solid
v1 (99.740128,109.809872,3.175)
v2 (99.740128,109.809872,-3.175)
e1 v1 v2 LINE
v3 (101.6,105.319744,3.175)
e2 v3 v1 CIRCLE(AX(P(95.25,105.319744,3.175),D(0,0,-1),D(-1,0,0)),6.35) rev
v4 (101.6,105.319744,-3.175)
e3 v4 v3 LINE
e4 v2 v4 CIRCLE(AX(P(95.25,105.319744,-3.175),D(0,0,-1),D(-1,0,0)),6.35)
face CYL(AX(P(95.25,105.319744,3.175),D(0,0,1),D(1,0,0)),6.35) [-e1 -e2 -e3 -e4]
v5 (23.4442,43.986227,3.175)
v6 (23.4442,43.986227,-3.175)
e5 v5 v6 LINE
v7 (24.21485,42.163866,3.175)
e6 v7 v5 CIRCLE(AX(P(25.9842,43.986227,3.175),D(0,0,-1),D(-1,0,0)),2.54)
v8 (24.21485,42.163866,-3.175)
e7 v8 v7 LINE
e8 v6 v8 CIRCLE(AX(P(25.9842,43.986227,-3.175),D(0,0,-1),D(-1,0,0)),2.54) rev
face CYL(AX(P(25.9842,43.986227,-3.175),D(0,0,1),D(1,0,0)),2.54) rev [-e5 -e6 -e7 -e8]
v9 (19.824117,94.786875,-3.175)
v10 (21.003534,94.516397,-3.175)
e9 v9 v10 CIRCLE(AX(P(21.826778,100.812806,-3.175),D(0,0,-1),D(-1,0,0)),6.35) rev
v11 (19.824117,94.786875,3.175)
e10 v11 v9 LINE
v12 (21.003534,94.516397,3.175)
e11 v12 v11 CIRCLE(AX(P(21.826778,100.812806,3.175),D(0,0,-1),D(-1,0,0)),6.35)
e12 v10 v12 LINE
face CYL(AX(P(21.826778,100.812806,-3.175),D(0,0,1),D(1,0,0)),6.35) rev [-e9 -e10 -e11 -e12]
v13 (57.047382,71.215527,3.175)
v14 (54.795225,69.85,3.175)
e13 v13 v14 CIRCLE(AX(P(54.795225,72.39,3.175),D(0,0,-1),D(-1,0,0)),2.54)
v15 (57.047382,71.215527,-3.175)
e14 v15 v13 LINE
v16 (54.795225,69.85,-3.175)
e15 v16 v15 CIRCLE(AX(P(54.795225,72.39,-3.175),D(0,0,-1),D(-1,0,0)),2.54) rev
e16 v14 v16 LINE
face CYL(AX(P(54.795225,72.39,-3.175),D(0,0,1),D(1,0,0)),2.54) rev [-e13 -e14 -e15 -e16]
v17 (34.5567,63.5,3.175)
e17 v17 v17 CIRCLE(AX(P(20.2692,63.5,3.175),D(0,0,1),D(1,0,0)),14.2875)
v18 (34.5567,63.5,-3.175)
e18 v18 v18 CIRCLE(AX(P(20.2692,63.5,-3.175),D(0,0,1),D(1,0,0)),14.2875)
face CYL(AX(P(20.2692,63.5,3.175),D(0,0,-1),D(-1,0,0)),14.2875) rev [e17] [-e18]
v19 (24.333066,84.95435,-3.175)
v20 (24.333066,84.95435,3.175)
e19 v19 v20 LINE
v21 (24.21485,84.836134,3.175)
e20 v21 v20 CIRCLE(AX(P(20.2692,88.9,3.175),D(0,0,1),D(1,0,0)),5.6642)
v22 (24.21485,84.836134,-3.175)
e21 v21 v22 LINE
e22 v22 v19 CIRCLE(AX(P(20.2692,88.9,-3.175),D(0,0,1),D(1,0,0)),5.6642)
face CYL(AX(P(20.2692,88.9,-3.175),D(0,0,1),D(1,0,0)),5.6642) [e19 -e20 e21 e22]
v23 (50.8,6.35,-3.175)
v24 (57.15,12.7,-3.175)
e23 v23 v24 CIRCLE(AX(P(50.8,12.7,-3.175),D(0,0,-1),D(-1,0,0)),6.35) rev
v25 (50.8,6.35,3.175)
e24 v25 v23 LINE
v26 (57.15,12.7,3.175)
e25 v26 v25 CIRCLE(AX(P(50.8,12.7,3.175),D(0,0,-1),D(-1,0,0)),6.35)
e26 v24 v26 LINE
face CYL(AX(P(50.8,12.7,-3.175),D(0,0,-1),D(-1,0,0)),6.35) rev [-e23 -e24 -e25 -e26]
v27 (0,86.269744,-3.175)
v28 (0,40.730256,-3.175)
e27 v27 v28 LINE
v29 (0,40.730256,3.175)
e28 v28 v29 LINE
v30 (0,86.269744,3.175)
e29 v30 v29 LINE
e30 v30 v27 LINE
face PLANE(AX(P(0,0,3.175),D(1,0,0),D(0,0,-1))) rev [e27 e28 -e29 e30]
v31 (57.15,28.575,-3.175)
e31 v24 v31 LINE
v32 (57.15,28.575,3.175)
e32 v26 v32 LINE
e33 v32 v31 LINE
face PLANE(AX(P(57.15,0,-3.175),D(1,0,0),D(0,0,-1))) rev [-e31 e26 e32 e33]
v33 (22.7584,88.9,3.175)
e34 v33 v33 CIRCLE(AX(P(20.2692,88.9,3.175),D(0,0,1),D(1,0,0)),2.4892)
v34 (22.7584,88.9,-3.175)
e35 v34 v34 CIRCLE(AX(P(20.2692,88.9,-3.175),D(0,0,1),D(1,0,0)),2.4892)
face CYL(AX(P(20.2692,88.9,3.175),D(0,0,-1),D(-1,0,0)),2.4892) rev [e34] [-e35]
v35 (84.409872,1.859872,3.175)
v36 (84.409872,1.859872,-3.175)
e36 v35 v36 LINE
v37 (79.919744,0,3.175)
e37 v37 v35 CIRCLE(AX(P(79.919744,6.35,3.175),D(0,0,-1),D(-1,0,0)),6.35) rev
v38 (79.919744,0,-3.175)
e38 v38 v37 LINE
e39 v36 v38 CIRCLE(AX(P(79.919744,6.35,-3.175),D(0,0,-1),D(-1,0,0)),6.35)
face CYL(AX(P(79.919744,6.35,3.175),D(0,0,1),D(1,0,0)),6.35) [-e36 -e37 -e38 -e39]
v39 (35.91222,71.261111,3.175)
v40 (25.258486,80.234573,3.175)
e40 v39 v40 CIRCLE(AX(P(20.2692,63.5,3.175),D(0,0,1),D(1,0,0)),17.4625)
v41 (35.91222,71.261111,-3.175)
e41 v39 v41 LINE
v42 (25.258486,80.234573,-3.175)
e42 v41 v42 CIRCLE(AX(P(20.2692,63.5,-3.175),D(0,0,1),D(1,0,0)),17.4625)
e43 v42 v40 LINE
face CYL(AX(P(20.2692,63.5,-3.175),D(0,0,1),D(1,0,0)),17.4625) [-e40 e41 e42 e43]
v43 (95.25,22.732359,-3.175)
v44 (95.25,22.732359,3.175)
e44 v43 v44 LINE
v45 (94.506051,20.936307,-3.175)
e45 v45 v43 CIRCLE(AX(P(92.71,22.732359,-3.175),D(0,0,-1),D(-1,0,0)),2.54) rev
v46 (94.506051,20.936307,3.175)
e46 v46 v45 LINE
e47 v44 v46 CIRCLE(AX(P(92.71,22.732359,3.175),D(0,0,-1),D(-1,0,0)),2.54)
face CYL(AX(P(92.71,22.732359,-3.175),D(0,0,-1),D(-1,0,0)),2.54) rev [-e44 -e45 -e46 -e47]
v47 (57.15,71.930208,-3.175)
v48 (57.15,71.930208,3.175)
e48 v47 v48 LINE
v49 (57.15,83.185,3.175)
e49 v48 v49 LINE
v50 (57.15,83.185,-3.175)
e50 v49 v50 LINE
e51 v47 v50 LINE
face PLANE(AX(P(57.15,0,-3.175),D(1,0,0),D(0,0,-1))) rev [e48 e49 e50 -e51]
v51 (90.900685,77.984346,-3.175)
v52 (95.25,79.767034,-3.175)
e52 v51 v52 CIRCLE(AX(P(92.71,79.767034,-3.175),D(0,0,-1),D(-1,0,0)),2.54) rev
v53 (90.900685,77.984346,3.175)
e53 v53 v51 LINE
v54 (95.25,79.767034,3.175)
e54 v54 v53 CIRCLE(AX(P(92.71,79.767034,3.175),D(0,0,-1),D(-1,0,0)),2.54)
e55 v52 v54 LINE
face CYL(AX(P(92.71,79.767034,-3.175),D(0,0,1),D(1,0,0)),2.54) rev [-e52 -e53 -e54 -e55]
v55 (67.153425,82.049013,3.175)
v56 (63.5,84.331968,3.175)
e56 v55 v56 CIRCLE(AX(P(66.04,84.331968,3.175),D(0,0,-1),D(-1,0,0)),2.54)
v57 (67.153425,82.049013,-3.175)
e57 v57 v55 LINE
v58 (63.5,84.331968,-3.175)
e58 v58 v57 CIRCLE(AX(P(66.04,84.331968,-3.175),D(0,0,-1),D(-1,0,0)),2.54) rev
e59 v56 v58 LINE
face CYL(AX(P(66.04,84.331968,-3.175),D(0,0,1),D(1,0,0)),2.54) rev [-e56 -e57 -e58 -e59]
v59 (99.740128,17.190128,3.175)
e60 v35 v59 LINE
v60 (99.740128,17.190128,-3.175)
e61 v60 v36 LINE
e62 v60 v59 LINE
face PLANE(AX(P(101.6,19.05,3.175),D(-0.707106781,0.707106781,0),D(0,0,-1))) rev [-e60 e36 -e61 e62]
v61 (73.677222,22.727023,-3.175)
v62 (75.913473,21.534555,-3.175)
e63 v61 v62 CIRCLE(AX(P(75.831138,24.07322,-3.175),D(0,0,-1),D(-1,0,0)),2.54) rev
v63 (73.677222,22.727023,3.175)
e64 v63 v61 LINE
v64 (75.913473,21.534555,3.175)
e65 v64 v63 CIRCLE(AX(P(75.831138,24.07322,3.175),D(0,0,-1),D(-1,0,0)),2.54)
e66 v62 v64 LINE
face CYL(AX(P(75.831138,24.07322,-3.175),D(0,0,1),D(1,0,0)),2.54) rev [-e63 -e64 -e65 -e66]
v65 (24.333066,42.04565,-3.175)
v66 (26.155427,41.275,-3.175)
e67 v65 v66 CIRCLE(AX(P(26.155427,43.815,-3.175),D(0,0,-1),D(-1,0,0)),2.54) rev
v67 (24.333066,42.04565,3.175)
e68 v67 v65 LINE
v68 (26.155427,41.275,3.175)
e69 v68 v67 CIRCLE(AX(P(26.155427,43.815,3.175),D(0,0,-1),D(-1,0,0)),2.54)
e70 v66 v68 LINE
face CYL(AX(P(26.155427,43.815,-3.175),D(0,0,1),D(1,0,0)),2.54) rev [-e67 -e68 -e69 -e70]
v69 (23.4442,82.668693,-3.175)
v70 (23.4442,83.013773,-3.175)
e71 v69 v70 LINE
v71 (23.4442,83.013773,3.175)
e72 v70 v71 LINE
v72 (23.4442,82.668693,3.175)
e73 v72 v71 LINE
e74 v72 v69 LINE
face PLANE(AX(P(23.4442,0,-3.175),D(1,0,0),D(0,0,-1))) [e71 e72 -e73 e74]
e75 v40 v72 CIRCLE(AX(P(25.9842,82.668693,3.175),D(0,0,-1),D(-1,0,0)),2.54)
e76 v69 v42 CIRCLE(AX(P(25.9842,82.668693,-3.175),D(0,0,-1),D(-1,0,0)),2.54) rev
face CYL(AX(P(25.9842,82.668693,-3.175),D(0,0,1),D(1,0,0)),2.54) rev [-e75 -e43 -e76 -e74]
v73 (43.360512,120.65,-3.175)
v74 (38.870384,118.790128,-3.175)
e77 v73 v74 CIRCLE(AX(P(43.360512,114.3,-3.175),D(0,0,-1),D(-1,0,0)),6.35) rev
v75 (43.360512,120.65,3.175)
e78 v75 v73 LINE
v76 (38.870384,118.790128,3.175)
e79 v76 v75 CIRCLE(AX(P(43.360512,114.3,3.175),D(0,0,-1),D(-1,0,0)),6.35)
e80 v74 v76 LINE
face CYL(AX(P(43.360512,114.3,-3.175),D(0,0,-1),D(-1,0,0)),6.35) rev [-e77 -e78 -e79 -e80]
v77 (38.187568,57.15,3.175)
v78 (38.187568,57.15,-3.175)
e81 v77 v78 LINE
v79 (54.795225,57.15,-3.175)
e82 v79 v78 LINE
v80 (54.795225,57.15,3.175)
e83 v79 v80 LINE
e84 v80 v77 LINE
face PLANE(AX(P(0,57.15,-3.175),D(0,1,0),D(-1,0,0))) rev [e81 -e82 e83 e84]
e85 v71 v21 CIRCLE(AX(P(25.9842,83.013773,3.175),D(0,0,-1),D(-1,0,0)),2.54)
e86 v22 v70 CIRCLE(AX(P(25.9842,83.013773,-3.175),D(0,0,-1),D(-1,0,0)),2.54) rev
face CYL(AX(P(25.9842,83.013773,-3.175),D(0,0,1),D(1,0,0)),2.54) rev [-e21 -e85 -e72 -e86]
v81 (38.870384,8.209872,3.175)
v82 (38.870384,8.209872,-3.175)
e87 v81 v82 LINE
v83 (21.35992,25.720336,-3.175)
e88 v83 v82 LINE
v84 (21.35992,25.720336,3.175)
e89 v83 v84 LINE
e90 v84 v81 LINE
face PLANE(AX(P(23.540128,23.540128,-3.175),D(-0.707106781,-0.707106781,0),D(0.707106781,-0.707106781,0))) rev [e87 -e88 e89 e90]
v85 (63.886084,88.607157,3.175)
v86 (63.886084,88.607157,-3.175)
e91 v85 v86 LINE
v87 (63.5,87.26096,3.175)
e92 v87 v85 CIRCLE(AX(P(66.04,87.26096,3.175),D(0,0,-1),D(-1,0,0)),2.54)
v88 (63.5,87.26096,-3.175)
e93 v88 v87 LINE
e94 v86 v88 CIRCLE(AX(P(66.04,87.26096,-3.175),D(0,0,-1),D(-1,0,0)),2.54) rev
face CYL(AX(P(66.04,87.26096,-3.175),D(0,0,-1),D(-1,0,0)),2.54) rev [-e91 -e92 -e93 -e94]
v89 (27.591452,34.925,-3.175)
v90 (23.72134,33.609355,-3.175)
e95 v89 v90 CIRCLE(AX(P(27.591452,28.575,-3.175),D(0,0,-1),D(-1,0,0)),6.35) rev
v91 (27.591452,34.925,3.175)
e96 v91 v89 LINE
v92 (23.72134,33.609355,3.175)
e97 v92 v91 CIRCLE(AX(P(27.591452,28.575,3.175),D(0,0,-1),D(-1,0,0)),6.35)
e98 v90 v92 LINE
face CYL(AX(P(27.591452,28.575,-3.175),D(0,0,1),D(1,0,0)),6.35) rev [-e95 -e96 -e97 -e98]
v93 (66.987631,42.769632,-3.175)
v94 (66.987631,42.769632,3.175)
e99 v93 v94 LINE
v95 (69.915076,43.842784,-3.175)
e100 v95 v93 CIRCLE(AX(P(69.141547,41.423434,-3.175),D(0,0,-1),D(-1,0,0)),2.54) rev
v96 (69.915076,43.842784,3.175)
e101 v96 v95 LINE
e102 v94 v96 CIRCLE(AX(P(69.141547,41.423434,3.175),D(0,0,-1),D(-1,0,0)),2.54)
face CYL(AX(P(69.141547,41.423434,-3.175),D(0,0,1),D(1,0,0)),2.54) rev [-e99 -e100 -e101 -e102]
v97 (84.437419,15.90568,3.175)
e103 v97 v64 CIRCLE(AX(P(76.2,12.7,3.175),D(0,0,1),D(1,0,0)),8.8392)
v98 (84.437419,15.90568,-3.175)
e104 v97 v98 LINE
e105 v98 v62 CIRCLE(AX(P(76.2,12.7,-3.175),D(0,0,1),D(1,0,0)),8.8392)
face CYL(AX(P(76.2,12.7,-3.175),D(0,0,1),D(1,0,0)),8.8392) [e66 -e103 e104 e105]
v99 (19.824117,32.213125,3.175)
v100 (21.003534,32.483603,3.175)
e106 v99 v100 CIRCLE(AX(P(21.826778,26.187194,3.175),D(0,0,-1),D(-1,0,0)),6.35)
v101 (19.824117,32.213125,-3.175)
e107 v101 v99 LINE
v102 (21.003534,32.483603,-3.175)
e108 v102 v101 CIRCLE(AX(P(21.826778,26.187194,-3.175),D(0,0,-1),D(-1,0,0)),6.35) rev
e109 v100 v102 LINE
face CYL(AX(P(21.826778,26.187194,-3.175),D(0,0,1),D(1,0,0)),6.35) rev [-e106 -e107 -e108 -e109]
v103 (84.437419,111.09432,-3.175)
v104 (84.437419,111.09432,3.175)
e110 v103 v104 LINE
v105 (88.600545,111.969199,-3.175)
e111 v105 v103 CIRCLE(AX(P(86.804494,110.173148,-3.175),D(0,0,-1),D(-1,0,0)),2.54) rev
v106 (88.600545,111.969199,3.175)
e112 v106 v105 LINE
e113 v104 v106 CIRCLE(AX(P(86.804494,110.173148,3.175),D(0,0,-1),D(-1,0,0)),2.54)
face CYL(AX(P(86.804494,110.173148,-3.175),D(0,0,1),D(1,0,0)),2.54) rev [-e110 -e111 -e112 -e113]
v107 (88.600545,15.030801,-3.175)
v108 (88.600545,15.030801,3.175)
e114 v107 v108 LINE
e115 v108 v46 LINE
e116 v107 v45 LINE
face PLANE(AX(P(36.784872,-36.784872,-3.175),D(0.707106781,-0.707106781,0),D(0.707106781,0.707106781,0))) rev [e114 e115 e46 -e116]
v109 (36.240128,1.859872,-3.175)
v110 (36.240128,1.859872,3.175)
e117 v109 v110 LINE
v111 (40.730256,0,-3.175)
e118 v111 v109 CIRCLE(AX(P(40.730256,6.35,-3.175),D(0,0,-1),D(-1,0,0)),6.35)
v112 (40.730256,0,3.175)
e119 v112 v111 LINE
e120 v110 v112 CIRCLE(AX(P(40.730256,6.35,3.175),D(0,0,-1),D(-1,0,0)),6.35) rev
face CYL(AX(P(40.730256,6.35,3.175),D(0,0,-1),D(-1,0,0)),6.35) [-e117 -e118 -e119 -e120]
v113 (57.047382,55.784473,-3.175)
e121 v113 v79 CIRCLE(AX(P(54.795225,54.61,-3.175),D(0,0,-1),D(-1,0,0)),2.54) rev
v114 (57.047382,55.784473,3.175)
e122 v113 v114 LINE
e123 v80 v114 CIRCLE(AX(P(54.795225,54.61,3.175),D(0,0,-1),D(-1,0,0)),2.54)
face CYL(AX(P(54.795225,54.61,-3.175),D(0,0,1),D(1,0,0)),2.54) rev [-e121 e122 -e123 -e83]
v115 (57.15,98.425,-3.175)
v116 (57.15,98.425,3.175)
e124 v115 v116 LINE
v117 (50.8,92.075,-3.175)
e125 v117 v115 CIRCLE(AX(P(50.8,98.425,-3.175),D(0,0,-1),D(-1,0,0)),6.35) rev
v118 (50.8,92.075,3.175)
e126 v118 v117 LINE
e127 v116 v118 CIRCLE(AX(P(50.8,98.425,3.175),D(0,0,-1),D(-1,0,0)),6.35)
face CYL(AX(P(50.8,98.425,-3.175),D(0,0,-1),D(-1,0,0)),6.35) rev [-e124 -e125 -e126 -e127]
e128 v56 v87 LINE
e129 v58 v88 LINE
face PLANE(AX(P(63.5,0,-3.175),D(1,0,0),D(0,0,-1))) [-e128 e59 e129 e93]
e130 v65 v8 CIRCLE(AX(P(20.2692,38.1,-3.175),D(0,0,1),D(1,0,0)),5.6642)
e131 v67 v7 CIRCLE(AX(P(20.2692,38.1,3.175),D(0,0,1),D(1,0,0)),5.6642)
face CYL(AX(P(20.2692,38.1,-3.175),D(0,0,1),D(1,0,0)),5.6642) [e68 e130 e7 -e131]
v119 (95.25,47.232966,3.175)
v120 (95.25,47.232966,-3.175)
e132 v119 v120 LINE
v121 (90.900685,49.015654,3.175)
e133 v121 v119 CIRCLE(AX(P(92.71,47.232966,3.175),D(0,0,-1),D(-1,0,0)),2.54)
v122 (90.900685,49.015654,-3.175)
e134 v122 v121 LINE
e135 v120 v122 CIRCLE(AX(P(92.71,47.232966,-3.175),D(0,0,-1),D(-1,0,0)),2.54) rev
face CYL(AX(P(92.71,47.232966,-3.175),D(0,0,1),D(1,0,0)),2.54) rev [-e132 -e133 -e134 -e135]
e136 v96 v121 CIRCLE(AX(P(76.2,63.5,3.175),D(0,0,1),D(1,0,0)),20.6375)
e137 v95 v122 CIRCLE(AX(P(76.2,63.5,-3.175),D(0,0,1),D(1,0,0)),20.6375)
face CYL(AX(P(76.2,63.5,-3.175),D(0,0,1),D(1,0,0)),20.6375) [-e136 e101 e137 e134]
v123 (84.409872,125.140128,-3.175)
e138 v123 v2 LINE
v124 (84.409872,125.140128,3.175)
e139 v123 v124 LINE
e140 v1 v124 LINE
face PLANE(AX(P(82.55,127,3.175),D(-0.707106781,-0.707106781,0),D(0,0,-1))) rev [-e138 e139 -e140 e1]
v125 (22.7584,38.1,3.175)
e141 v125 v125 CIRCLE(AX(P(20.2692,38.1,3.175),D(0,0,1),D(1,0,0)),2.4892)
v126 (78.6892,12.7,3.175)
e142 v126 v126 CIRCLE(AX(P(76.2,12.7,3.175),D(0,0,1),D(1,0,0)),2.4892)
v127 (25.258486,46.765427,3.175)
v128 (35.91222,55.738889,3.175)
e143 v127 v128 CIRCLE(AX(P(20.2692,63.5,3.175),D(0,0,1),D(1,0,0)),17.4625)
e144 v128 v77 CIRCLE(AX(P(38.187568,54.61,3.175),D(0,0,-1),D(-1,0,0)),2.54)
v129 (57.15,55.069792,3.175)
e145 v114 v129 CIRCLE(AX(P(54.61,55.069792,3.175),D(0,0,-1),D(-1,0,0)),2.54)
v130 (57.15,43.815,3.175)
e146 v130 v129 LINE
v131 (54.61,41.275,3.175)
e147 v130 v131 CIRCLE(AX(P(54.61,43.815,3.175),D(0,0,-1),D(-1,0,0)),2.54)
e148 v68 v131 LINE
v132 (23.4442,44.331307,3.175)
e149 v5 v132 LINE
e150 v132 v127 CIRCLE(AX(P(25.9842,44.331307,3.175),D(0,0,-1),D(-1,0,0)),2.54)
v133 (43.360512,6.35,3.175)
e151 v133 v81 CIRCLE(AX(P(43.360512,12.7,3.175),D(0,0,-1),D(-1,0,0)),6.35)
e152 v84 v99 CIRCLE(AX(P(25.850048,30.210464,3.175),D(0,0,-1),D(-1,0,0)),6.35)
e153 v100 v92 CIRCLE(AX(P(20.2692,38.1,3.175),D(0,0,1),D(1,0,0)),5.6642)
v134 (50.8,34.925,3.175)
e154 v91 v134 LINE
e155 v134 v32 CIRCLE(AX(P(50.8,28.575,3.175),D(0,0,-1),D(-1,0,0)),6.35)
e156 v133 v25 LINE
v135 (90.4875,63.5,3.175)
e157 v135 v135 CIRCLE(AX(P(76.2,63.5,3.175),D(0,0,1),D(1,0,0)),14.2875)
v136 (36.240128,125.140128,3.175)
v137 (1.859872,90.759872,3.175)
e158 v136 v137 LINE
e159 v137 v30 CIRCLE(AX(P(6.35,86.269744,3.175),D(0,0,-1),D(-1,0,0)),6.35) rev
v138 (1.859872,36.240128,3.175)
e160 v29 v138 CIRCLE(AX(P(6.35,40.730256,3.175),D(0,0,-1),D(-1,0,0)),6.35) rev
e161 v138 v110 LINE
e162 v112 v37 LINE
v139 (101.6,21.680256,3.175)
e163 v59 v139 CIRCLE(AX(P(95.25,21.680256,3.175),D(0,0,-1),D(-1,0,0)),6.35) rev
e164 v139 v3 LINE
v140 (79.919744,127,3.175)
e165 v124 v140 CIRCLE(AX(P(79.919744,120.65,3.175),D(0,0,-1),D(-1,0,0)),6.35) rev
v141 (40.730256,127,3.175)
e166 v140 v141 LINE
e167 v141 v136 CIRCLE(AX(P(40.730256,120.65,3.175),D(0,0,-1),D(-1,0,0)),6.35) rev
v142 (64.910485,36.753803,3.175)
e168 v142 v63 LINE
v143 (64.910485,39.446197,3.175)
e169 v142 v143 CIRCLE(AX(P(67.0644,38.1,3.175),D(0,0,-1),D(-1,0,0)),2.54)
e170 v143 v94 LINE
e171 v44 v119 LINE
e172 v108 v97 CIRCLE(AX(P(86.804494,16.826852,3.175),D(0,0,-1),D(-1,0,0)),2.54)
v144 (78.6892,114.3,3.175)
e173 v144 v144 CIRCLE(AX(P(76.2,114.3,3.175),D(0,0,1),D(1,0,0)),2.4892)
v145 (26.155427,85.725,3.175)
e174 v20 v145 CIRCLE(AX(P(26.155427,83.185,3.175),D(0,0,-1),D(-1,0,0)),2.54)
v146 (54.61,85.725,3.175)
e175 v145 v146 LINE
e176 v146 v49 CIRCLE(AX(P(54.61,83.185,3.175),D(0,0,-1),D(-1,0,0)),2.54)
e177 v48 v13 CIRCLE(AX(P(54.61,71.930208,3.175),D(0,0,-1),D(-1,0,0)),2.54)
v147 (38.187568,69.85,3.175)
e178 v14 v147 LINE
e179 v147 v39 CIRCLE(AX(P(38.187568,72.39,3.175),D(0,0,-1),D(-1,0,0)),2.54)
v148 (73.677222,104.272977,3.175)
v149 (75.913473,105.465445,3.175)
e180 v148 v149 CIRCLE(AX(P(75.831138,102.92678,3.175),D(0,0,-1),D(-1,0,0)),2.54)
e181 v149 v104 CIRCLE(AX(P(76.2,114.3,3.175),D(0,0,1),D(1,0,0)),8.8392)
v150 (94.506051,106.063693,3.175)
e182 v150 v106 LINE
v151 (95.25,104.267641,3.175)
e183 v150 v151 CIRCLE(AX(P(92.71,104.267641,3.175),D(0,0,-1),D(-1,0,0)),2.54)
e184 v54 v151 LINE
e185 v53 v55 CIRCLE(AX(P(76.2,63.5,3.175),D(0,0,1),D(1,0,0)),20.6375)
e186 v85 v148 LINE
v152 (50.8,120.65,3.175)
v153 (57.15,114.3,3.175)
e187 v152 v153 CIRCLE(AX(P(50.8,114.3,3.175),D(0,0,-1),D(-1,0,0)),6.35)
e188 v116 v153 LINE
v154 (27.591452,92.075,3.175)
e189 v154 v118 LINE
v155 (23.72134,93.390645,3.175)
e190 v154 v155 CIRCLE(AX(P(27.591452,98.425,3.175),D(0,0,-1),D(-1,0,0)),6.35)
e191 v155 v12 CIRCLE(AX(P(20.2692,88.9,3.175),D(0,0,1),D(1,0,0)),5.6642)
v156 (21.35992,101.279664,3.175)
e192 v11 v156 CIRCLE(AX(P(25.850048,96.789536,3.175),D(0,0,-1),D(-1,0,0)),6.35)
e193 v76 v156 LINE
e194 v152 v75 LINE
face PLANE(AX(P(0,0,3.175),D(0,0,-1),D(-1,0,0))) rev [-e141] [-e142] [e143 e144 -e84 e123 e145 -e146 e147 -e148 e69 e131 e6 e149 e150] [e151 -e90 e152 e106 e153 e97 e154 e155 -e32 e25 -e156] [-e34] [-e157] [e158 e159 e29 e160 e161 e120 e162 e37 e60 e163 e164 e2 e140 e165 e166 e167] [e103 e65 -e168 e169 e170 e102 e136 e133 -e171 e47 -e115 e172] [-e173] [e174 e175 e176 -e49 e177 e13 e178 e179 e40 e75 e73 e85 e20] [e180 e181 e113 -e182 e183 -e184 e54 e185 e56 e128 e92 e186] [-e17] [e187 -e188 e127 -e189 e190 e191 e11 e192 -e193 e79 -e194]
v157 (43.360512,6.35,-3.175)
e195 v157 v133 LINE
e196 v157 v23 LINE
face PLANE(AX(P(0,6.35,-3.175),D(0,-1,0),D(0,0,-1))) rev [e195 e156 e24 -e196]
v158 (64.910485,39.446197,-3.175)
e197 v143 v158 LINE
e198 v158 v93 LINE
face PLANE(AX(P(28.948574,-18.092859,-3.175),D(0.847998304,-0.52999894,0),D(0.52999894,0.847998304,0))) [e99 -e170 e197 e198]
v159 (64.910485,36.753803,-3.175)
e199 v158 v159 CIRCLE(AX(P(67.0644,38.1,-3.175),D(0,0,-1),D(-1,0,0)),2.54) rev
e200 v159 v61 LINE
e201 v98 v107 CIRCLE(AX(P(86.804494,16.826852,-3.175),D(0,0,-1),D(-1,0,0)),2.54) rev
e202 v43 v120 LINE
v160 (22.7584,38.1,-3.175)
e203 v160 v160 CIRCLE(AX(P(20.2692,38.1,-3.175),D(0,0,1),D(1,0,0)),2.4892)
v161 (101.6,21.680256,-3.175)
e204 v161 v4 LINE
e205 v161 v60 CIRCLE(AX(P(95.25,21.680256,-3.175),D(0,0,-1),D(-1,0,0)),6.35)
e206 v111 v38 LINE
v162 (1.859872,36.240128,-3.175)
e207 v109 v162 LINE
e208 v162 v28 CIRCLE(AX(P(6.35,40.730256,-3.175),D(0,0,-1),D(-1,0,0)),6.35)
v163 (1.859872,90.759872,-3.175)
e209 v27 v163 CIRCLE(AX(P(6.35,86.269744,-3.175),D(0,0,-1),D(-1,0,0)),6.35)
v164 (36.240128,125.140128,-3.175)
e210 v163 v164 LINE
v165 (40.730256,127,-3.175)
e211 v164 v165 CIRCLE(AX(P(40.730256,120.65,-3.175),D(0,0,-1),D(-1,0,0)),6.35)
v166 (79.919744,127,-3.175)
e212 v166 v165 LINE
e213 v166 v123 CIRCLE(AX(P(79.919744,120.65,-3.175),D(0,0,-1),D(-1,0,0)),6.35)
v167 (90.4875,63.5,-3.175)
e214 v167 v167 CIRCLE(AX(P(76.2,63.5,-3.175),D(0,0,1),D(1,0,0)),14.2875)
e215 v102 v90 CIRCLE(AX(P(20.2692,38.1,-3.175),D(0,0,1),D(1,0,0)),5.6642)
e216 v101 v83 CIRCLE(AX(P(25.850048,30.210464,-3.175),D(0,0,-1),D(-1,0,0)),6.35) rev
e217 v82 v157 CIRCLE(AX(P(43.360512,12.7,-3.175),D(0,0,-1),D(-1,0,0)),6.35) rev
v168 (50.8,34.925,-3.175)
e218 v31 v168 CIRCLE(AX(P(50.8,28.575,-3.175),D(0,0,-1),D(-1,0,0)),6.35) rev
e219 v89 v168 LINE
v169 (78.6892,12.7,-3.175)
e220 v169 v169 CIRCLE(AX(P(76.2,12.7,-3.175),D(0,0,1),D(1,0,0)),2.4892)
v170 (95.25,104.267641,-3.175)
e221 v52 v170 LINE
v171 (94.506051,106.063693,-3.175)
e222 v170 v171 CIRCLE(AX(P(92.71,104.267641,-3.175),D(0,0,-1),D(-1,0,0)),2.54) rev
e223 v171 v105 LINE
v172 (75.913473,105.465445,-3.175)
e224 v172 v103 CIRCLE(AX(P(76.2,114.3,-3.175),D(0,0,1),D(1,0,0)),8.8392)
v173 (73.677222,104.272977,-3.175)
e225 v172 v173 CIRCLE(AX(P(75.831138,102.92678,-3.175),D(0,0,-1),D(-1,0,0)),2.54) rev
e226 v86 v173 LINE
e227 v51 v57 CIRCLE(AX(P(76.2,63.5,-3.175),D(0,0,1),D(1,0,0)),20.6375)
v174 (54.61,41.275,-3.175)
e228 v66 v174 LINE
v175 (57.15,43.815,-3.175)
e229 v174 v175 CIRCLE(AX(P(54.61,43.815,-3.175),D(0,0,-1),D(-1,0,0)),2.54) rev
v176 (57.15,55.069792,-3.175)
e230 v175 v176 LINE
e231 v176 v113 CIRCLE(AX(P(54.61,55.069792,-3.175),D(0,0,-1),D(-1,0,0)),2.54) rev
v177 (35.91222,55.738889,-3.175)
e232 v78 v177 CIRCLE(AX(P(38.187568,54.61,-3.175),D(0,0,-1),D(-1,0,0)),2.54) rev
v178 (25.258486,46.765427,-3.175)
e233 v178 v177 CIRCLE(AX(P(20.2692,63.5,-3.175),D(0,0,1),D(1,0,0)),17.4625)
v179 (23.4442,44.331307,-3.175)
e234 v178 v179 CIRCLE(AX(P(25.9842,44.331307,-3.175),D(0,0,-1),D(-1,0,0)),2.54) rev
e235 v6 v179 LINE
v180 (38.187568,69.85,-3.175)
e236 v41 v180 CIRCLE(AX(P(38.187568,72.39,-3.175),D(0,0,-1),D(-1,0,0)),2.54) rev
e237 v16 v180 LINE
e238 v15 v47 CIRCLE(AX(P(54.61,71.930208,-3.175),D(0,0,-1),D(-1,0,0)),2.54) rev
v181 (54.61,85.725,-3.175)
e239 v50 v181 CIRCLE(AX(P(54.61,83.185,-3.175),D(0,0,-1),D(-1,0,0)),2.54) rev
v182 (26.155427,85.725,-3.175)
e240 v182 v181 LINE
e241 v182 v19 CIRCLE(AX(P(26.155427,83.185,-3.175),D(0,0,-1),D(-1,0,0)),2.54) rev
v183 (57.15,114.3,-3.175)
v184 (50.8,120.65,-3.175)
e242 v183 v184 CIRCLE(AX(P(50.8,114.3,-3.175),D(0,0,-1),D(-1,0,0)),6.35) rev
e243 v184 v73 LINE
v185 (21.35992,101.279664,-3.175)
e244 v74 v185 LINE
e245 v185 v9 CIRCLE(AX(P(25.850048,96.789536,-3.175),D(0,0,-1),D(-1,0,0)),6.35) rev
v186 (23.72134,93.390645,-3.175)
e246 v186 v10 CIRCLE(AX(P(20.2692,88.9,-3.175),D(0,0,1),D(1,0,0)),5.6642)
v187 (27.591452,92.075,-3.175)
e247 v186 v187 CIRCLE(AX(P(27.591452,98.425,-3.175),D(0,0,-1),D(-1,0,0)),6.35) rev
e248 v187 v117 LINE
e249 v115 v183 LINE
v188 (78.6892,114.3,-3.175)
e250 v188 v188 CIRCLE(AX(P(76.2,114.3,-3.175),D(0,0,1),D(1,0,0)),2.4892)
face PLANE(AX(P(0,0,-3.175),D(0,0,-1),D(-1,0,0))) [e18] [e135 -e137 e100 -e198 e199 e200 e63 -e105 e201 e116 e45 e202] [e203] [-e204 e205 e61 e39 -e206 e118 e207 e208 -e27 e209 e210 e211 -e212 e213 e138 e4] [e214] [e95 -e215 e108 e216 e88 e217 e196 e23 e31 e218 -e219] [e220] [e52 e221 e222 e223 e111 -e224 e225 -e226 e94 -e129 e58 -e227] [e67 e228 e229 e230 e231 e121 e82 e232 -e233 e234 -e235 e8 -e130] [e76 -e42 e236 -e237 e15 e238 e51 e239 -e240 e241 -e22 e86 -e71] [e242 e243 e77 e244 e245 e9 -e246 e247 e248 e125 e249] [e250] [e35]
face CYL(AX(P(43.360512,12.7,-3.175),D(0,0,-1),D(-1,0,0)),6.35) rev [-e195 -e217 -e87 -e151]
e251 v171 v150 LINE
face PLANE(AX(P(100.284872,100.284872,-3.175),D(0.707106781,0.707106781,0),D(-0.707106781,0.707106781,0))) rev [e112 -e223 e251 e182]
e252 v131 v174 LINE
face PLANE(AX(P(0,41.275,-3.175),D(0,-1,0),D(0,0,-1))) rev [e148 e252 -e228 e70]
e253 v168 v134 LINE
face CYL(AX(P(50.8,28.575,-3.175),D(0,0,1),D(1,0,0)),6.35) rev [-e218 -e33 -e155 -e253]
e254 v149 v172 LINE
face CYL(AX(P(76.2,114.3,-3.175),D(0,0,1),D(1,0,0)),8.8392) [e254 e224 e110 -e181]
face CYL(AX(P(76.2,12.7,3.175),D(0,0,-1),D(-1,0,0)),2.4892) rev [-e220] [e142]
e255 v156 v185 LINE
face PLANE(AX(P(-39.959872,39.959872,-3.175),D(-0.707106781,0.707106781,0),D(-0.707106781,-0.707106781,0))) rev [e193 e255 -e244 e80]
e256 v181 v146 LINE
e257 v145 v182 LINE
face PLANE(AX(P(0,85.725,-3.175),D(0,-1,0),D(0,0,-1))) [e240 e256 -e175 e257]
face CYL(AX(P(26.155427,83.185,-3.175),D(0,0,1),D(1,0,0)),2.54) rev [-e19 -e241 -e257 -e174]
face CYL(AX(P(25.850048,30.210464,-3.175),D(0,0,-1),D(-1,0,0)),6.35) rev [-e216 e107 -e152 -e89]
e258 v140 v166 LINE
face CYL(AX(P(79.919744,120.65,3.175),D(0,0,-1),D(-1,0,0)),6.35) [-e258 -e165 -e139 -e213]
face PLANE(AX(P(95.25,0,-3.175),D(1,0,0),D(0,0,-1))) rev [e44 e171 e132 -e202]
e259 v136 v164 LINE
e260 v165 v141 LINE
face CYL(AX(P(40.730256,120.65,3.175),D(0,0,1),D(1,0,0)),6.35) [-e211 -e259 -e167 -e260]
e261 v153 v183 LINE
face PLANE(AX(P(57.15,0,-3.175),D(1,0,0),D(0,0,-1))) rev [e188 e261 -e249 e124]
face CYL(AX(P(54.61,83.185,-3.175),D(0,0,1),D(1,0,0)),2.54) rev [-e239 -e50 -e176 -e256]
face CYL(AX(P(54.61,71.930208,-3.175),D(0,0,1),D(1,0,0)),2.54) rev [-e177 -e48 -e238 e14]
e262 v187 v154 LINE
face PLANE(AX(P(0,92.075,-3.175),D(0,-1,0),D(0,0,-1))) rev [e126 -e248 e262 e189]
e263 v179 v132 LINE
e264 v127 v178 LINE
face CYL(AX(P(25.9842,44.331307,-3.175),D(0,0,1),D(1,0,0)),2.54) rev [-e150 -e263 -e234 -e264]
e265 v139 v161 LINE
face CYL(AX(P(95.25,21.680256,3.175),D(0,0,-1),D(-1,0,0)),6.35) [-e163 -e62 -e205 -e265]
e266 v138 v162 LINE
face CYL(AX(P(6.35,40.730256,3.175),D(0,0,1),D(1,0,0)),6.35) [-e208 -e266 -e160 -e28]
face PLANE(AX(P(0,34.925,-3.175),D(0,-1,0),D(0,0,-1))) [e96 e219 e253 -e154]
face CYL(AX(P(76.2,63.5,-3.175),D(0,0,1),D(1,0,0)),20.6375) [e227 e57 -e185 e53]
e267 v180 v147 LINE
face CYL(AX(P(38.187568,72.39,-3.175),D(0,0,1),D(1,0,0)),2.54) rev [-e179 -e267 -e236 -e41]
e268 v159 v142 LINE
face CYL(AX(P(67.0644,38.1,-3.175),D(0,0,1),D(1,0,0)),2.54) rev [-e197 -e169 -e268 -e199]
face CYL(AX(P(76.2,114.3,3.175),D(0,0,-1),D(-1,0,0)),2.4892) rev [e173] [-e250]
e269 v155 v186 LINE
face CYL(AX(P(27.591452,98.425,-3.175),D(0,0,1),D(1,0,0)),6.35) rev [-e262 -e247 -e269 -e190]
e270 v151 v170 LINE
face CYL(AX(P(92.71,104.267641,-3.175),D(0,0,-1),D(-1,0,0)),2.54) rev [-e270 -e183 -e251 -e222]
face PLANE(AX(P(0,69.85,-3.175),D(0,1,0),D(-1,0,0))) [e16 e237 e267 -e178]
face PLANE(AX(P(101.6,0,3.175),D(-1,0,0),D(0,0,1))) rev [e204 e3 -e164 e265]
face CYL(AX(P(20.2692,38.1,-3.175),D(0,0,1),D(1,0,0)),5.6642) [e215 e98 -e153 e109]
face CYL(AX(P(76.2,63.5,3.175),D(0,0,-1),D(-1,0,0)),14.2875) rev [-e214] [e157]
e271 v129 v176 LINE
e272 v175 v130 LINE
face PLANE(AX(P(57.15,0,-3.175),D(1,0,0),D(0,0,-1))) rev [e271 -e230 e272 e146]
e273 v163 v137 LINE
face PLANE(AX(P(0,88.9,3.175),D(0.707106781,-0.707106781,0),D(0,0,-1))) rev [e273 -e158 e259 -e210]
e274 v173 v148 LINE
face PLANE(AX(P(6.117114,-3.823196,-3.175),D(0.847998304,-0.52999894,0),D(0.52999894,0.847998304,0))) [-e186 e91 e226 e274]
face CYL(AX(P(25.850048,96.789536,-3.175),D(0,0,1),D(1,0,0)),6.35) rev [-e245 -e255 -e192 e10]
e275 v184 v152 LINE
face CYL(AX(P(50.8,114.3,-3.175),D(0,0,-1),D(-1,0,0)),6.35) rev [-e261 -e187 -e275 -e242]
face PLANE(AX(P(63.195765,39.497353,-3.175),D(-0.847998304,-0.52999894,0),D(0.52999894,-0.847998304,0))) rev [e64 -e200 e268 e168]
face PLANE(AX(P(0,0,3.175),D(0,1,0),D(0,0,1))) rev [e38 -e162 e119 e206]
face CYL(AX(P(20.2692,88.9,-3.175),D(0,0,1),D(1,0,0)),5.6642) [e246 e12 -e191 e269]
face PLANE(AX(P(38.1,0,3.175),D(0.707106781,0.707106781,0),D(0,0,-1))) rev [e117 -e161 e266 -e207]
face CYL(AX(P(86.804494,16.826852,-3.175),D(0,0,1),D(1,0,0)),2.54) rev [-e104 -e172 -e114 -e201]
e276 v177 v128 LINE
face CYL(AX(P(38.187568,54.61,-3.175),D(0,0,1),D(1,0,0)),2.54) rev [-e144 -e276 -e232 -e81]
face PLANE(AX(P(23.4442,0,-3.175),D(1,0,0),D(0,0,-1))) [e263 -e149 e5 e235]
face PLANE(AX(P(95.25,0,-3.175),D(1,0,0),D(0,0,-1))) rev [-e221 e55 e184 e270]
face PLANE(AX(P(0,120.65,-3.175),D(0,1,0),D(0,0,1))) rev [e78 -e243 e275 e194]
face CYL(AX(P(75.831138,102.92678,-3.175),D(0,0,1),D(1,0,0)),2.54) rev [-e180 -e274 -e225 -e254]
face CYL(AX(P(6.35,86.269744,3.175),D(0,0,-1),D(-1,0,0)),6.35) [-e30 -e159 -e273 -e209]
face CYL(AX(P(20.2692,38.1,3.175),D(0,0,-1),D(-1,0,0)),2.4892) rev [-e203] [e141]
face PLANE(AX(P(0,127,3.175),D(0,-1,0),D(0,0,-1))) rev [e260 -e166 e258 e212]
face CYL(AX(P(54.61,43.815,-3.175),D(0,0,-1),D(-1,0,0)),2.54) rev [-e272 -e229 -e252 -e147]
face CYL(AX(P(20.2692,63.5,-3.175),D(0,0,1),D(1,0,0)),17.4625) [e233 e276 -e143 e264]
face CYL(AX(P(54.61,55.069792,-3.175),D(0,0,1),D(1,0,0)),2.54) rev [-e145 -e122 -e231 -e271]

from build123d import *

# Parameters (mm, degrees)
SKETCH1_W           = 101.6
SKETCH1_H           = 127
SKETCH1_R           = 2.4892
SKETCH1_R_2         = 14.2875
BOSS_EXTRUDE1_DEPTH = 3.175
CHAMFER2_SIZE       = 38.1
CHAMFER3_SIZE       = 19.05
FILLET2_R           = 6.35
CUT_EXTRUDE2_DEPTH  = 163.763271348
FILLET11_R          = 2.54
FILLET12_R          = 6.35


with BuildPart() as part:
    # Sketch1 → Boss-Extrude1 (new, symmetric)
    with BuildSketch(Plane.XY):
        with Locations((50.8, 63.5)):
            Rectangle(SKETCH1_W, SKETCH1_H)
        with Locations((20.2692, 88.9)):
            Circle(SKETCH1_R, mode=Mode.SUBTRACT)
        with Locations((20.2692, 63.5)):
            Circle(SKETCH1_R_2, mode=Mode.SUBTRACT)
        with Locations((20.2692, 38.1)):
            Circle(SKETCH1_R, mode=Mode.SUBTRACT)
        with Locations((76.2, 114.3)):
            Circle(SKETCH1_R, mode=Mode.SUBTRACT)
        with Locations((76.2, 63.5)):
            Circle(SKETCH1_R_2, mode=Mode.SUBTRACT)
        with Locations((76.2, 12.7)):
            Circle(SKETCH1_R, mode=Mode.SUBTRACT)
    extrude(amount=BOSS_EXTRUDE1_DEPTH, both=True)

    # Chamfer2
    chamfer2_edges = [part.edges().sort_by_distance(p)[0] for p in [
        (0, 127, 0),
        (0, 0, 0),
    ]]
    chamfer(chamfer2_edges, length=CHAMFER2_SIZE)

    # Chamfer3
    chamfer3_edges = [part.edges().sort_by_distance(p)[0] for p in [
        (101.6, 127, 0),
        (101.6, 0, 0),
    ]]
    chamfer(chamfer3_edges, length=CHAMFER3_SIZE)

    # Fillet2
    fillet2_edges = [part.edges().sort_by_distance(p)[0] for p in [
        (38.1, 0, 0),
        (0, 88.9, 0),
        (0, 38.1, 0),
        (38.1, 127, 0),
        (101.6, 107.95, 0),
        (101.6, 19.05, 0),
        (82.55, 0, 0),
        (82.55, 127, 0),
    ]]
    fillet(fillet2_edges, radius=FILLET2_R)

    # Sketch2 → Cut-Extrude2 (cut, through all)
    with BuildSketch(Plane.XY.offset(3.175)):
        with BuildLine():
            Line((23.4442, 84.209313841), (23.4442, 80.671437949))
            ThreePointArc((23.4442, 80.671437949), (31.394578854, 76.959749314), (36.536234341, 69.85))
            Line((36.536234341, 69.85), (56.563709458, 69.85))
            ThreePointArc((56.563709458, 69.85), (56.840575731, 70.649762109), (57.15, 71.4375))
            Line((57.15, 71.4375), (57.15, 85.725))
            Line((57.15, 85.725), (24.959886159, 85.725))
            ThreePointArc((24.959886159, 85.725), (24.27439423, 84.89480577), (23.4442, 84.209313841))
        make_face()
        with BuildLine():
            Line((56.563709458, 57.15), (36.536234341, 57.15))
            ThreePointArc((36.536234341, 57.15), (31.394578854, 50.040250686), (23.4442, 46.328562051))
            Line((23.4442, 46.328562051), (23.4442, 42.790686159))
            ThreePointArc((23.4442, 42.790686159), (24.27439423, 42.10519423), (24.959886159, 41.275))
            Line((24.959886159, 41.275), (57.15, 41.275))
            Line((57.15, 41.275), (57.15, 55.5625))
            ThreePointArc((57.15, 55.5625), (56.840575731, 56.350237891), (56.563709458, 57.15))
        make_face()
        with BuildLine():
            Line((63.5, 87.989421981), (63.5, 79.767034341))
            ThreePointArc((63.5, 79.767034341), (81.436975328, 83.461976246), (95.25, 71.4375))
            Line((95.25, 71.4375), (95.25, 105.319743879))
            Line((95.25, 105.319743879), (84.938355823, 115.631388056))
            ThreePointArc((84.938355823, 115.631388056), (82.324026952, 107.926009842), (74.520278177, 105.621867065))
            Line((74.520278177, 105.621867065), (63.5, 87.989421981))
        make_face()
        with BuildLine():
            Line((16.869792091, 96.78953597), (19.197448039, 94.461880022))
            ThreePointArc((19.197448039, 94.461880022), (22.436795498, 94.133038448), (24.959886159, 92.075))
            Line((24.959886159, 92.075), (57.15, 92.075))
            Line((57.15, 92.075), (57.15, 120.65))
            Line((57.15, 120.65), (40.730256121, 120.65))
            Line((40.730256121, 120.65), (16.869792091, 96.78953597))
        make_face()
        with BuildLine():
            Line((57.15, 6.35), (57.15, 34.925))
            Line((57.15, 34.925), (24.959886159, 34.925))
            ThreePointArc((24.959886159, 34.925), (22.436795498, 32.866961552), (19.197448039, 32.538119978))
            Line((19.197448039, 32.538119978), (16.869792091, 30.21046403))
            Line((16.869792091, 30.21046403), (40.730256121, 6.35))
            Line((40.730256121, 6.35), (57.15, 6.35))
        make_face()
        with BuildLine():
            ThreePointArc((95.25, 55.5625), (83.968438742, 44.380435001), (68.08475867, 44.525035852))
            Line((68.08475867, 44.525035852), (64.069111262, 38.1))
            Line((64.069111262, 38.1), (74.520278177, 21.378132935))
            ThreePointArc((74.520278177, 21.378132935), (82.324026952, 19.073990158), (84.938355823, 11.368611944))
            Line((84.938355823, 11.368611944), (95.25, 21.680256121))
            Line((95.25, 21.680256121), (95.25, 55.5625))
        make_face()
    extrude(amount=-CUT_EXTRUDE2_DEPTH, mode=Mode.SUBTRACT)

    # Fillet11
    # the kernel refuses this fillet: 2.54 mm, written as the material it adds along each edge
    with BuildSketch(Plane(origin=(23.4442, 84.209313841, 3.175), x_dir=(0, -1, 0), z_dir=(0, 0, -1))) as fillet11_piece_1:
        with BuildLine():
            CenterArc((1.19554121, -2.54), FILLET11_R, 90, 45.845590986)
            ThreePointArc((-0.626820204, -0.770650155), (-0.296483035, -0.399092969), (0, 0))
            Line((0, 0), (1.19554121, 0))
        make_face()
    extrude(amount=6.35)
    with BuildSketch(Plane(origin=(24.959886159, 85.725, 3.175), x_dir=(1, 0, 0), z_dir=(0, 0, -1)), Plane(origin=(23.4442, 42.790686159, 3.175), x_dir=(0, 1, 0), z_dir=(0, 0, -1))) as fillet11_piece_2:
        with BuildLine():
            CenterArc((1.19554121, 2.54), FILLET11_R, 224.154409014, 45.845590986)
            ThreePointArc((-0.626820204, 0.770650155), (-0.296483035, 0.399092969), (0, 0))
            Line((0, 0), (1.19554121, 0))
        make_face()
    extrude(amount=6.35)
    with BuildSketch(Plane(origin=(57.15, 85.725, 3.175), x_dir=(0, -1, 0), z_dir=(0, 0, -1)), Plane(origin=(57.15, 41.275, 3.175), x_dir=(-1, 0, 0), z_dir=(0, 0, -1))) as fillet11_piece_3:
        with BuildLine():
            CenterArc((FILLET11_R, FILLET11_R), FILLET11_R, 180, 90)
            Line((0, FILLET11_R), (0, 0))
            Line((0, 0), (FILLET11_R, 0))
        make_face()
    extrude(amount=6.35)
    with BuildSketch(Plane(origin=(57.15, 71.4375, 3.175), x_dir=(-0.37419332307187475, -0.927350719506071, 0), z_dir=(0, 0, -1))) as fillet11_piece_4:
        with BuildLine():
            CenterArc((0.493537959, 2.539838856), FILLET11_R, 248.025535945, 21.329063163)
            Line((-0.456913081, 0.184368029), (0, 0))
            ThreePointArc((0, 0), (0.232463532, 0.001309292), (0.464927063, 0))
        make_face()
    extrude(amount=6.35)
    with BuildSketch(Plane(origin=(56.563709458, 69.85, 3.175), x_dir=(-1, 0, 0), z_dir=(0, 0, -1))) as fillet11_piece_5:
        with BuildLine():
            CenterArc((1.768484772, 2.54), FILLET11_R, 202.554474341, 67.445525659)
            ThreePointArc((-0.577244029, 1.565753425), (-0.27278948, 0.78871367), (0, 0))
            Line((0, 0), (1.768484772, 0))
        make_face()
    extrude(amount=6.35)
    with BuildSketch(Plane(origin=(36.536234341, 69.85, 3.175), x_dir=(-0.40443527026197257, 0.9145666253303393, 0), z_dir=(0, 0, -1))) as fillet11_piece_6:
        with BuildLine():
            CenterArc((1.655141716, 2.537520097), FILLET11_R, 203.855743112, 63.612200039)
            Line((-0.667857512, 1.510254511), (0, 0))
            ThreePointArc((0, 0), (0.771464359, 0.017049332), (1.542928718, 0))
        make_face()
    extrude(amount=6.35)
    with BuildSketch(Plane(origin=(23.4442, 80.671437949, 3.175), x_dir=(0, 1, 0), z_dir=(0, 0, -1))) as fillet11_piece_7:
        with BuildLine():
            CenterArc((1.997254788, 2.54), FILLET11_R, 196.601549599, 73.398450401)
            ThreePointArc((-0.436864925, 1.814285714), (-0.194179537, 0.91298276), (0, 0))
            Line((0, 0), (1.997254788, 0))
        make_face()
    extrude(amount=6.35)
    with BuildSketch(Plane(origin=(24.959886159, 41.275, 3.175), x_dir=(-0.6309969578574762, 0.7757853048199679, 0), z_dir=(0, 0, -1))) as fillet11_piece_8:
        with BuildLine():
            CenterArc((1.216111808, 2.530215575), FILLET11_R, 219.123714638, 45.845590986)
            Line((-0.754382867, 0.927483302), (0, 0))
            ThreePointArc((0, 0), (0.496690354, 0.021819267), (0.993380707, 0))
        make_face()
    extrude(amount=6.35)
    with BuildSketch(Plane(origin=(23.4442, 46.328562051, 3.175), x_dir=(0.9722123643495174, 0.23410065913175288, 0), z_dir=(0, 0, -1))) as fillet11_piece_9:
        with BuildLine():
            CenterArc((2.001860743, 2.536371474), FILLET11_R, 193.538615648, 73.398450401)
            Line((-0.467558662, 1.941755799), (0, 0))
            ThreePointArc((0, 0), (0.933070685, 0.024946119), (1.866141371, 0))
        make_face()
    extrude(amount=6.35)
    with BuildSketch(Plane(origin=(36.536234341, 57.15, 3.175), x_dir=(1, 0, 0), z_dir=(0, 0, -1))) as fillet11_piece_10:
        with BuildLine():
            CenterArc((1.651333505, 2.54), FILLET11_R, 206.387799961, 63.612200039)
            ThreePointArc((-0.624014793, 1.411111111), (-0.296414646, 0.712450907), (0, 0))
            Line((0, 0), (1.651333505, 0))
        make_face()
    extrude(amount=6.35)
    with BuildSketch(Plane(origin=(56.563709458, 57.15, 3.175), x_dir=(-1, 0, 0), z_dir=(0, 0, -1))) as fillet11_piece_11:
        with BuildLine():
            CenterArc((1.768484772, -2.54), FILLET11_R, 90, 67.445525659)
            ThreePointArc((-0.577244029, -1.565753425), (-0.27278948, -0.78871367), (0, 0))
            Line((0, 0), (1.768484772, 0))
        make_face()
    extrude(amount=6.35)
    with BuildSketch(Plane(origin=(57.15, 55.5625, 3.175), x_dir=(0, -1, 0), z_dir=(0, 0, -1))) as fillet11_piece_12:
        with BuildLine():
            CenterArc((0.49270796, 2.54), FILLET11_R, 248.670936837, 21.329063163)
            ThreePointArc((-0.431150447, 0.173972603), (-0.215085295, 0.088200474), (0, 0))
            Line((0, 0), (0.49270796, 0))
        make_face()
    extrude(amount=6.35)
    with BuildSketch(Plane(origin=(74.520278177, 105.621867065, 3.175), x_dir=(-0.5299989400031567, -0.8479983040051026, 0), z_dir=(0, 0, -1))) as fillet11_piece_13:
        with BuildLine():
            CenterArc((1.590675071, -2.54), FILLET11_R, 90, 59.85221241)
            ThreePointArc((-0.605746328, -1.264330357), (-0.27776736, -0.644193482), (0, 0))
            Line((0, 0), (1.590675071, 0))
        make_face()
    extrude(amount=6.35)
    with BuildSketch(Plane(origin=(84.938355823, 115.631388056, 3.175), x_dir=(0.707106781186531, -0.7071067811865639, 0), z_dir=(0, 0, -1))) as fillet11_piece_14:
        with BuildLine():
            CenterArc((5.17911732, 2.54), FILLET11_R, 156.26403204, 113.73596796)
            ThreePointArc((2.853975701, 3.562407183), (1.660911159, 1.593799007), (0, 0))
            Line((0, 0), (5.17911732, 0))
        make_face()
    extrude(amount=6.35)
    with BuildSketch(Plane(origin=(95.25, 105.319743879, 3.175), x_dir=(0, -1, 0), z_dir=(0, 0, -1)), Plane(origin=(95.25, 21.680256121, 3.175), x_dir=(-0.7071067811865459, -0.7071067811865492, 0), z_dir=(0, 0, -1))) as fillet11_piece_15:
        with BuildLine():
            CenterArc((FILLET11_R * 0.414213562373, FILLET11_R), FILLET11_R, 225, 45)
            Line((-FILLET11_R * 0.292893218813, FILLET11_R * 0.292893218813), (0, 0))
            Line((0, 0), (FILLET11_R * 0.414213562373, 0))
        make_face()
    extrude(amount=6.35)
    with BuildSketch(Plane(origin=(95.25, 71.4375, 3.175), x_dir=(-0.5533563502318898, 0.8329446258053667, 0), z_dir=(0, 0, -1))) as fillet11_piece_16:
        with BuildLine():
            CenterArc((8.343565994, 2.493521372), FILLET11_R, 123.597578731, 135.424707486)
            Line((6.938040865, 4.609200722), (0, 0))
            ThreePointArc((0, 0), (3.929940505, 0.377638848), (7.859881009, 0))
        make_face()
    extrude(amount=6.35)
    with BuildSketch(Plane(origin=(63.5, 79.767034341, 3.175), x_dir=(0, 1, 0), z_dir=(0, 0, -1))) as fillet11_piece_17:
        with BuildLine():
            CenterArc((4.564934031, 2.54), FILLET11_R, 154.000955085, 115.999044915)
            ThreePointArc((2.281978593, 3.653424658), (1.236569999, 1.767011326), (0, 0))
            Line((0, 0), (4.564934031, 0))
        make_face()
    extrude(amount=6.35)
    with BuildSketch(Plane(origin=(63.5, 87.989421981, 3.175), x_dir=(0.5299989400031537, 0.8479983040051045, 0), z_dir=(0, 0, -1))) as fillet11_piece_18:
        with BuildLine():
            CenterArc((FILLET11_R * 0.286796226411, FILLET11_R), FILLET11_R, 237.994616792, 32.005383208)
            Line((-FILLET11_R * 0.243202713592, FILLET11_R * 0.152001695995), (0, 0))
            Line((0, 0), (FILLET11_R * 0.286796226411, 0))
        make_face()
    extrude(amount=6.35)
    with BuildSketch(Plane(origin=(84.938355823, 11.368611944, 3.175), x_dir=(-0.10974291485412428, 0.9939600055532016, 0), z_dir=(0, 0, -1))) as fillet11_piece_19:
        with BuildLine():
            CenterArc((5.220477065, 2.453869482), FILLET11_R, 141.300495955, 113.73596796)
            Line((3.238170083, 4.04196867), (0, 0))
            ThreePointArc((0, 0), (2.282319119, 0.299734204), (4.564638238, 0))
        make_face()
    extrude(amount=6.35)
    with BuildSketch(Plane(origin=(74.520278177, 21.378132935, 3.175), x_dir=(-0.5299989400031518, 0.8479983040051056, 0), z_dir=(0, 0, -1))) as fillet11_piece_20:
        with BuildLine():
            CenterArc((1.590675071, 2.54), FILLET11_R, 210.14778759, 59.85221241)
            ThreePointArc((-0.605746328, 1.264330357), (-0.27776736, 0.644193482), (0, 0))
            Line((0, 0), (1.590675071, 0))
        make_face()
    extrude(amount=6.35)
    with BuildSketch(Plane(origin=(64.069111262, 38.1, 3.175), x_dir=(0.5299989400031772, 0.8479983040050897, 0), z_dir=(0, 0, -1))) as fillet11_piece_21:
        with BuildLine():
            CenterArc((FILLET11_R * 0.625, FILLET11_R), FILLET11_R, 205.989233584, 64.010766416)
            Line((-FILLET11_R * 0.273876404494, FILLET11_R * 0.561797752809), (0, 0))
            Line((0, 0), (FILLET11_R * 0.625, 0))
        make_face()
    extrude(amount=6.35)
    with BuildSketch(Plane(origin=(68.08475867, 44.525035852, 3.175), x_dir=(-0.5299989400032423, -0.8479983040050492, 0), z_dir=(0, 0, -1))) as fillet11_piece_22:
        with BuildLine():
            CenterArc((2.070056099, -2.54), FILLET11_R, 90, 75.7250493)
            ThreePointArc((-0.391517908, -1.91369863), (-0.173104834, -0.961484054), (0, 0))
            Line((0, 0), (2.070056099, 0))
        make_face()
    extrude(amount=6.35)
    with BuildSketch(Plane(origin=(95.25, 55.5625, 3.175), x_dir=(0, -1, 0), z_dir=(0, 0, -1))) as fillet11_piece_23:
        with BuildLine():
            CenterArc((8.329534341, 2.54), FILLET11_R, 134.575292514, 135.424707486)
            ThreePointArc((6.546845646, 4.349315068), (3.482391678, 1.860105285), (0, 0))
            Line((0, 0), (8.329534341, 0))
        make_face()
    extrude(amount=6.35)

    # Fillet12
    # the kernel refuses this fillet: 6.35 mm, written as the material it adds along each edge
    with BuildSketch(Plane(origin=(57.15, 34.925, 3.175), x_dir=(-1, 0, 0), z_dir=(0, 0, -1)), Plane(origin=(57.15, 6.35, 3.175), x_dir=(0, 1, 0), z_dir=(0, 0, -1)), Plane(origin=(16.869792091, 96.78953597, 3.175), x_dir=(0.7071067811865476, -0.7071067811865476, 0), z_dir=(0, 0, -1)), Plane(origin=(57.15, 120.65, 3.175), x_dir=(-1, 0, 0), z_dir=(0, 0, -1)), Plane(origin=(57.15, 92.075, 3.175), x_dir=(0, 1, 0), z_dir=(0, 0, -1))) as fillet12_piece_1:
        with BuildLine():
            CenterArc((FILLET12_R, -FILLET12_R), FILLET12_R, 90, 90)
            Line((0, -FILLET12_R), (0, 0))
            Line((0, 0), (FILLET12_R, 0))
        make_face()
    extrude(amount=6.35)
    with BuildSketch(Plane(origin=(16.869792091, 30.21046403, 3.175), x_dir=(0.7071067811865469, 0.707106781186548, 0), z_dir=(0, 0, -1))) as fillet12_piece_2:
        with BuildLine():
            CenterArc((FILLET12_R, FILLET12_R), FILLET12_R, 180, 90)
            Line((0, FILLET12_R), (0, 0))
            Line((0, 0), (FILLET12_R, 0))
        make_face()
    extrude(amount=6.35)
    with BuildSketch(Plane(origin=(19.197448039, 32.538119978, 3.175), x_dir=(-0.7071067811865529, -0.7071067811865421, 0), z_dir=(0, 0, -1))) as fillet12_piece_3:
        with BuildLine():
            CenterArc((2.631565998, -6.35), FILLET12_R, 90, 37.550935819)
            ThreePointArc((-1.238546136, -1.31564482), (-0.566472915, -0.707528398), (0, 0))
            Line((0, 0), (2.631565998, 0))
        make_face()
    extrude(amount=6.35)
    with BuildSketch(Plane(origin=(24.959886159, 34.925, 3.175), x_dir=(-0.6854504427601381, -0.7281192831672093, 0), z_dir=(0, 0, -1)), Plane(origin=(19.197448039, 94.461880022, 3.175), x_dir=(0.999544738883237, 0.030171426397194983, 0), z_dir=(0, 0, -1))) as fillet12_piece_4:
        with BuildLine():
            CenterArc((2.81974937, -6.268704259), FILLET12_R, 99.178021959, 37.550935819)
            Line((-1.803808078, -1.916093948), (0, 0))
            ThreePointArc((0, 0), (0.90345418, -0.072515801), (1.806908361, 0))
        make_face()
    extrude(amount=6.35)
    with BuildSketch(Plane(origin=(40.730256121, 6.35, 3.175), x_dir=(1, 0, 0), z_dir=(0, 0, -1)), Plane(origin=(40.730256121, 120.65, 3.175), x_dir=(-0.7071067811865489, -0.7071067811865462, 0), z_dir=(0, 0, -1))) as fillet12_piece_5:
        with BuildLine():
            CenterArc((FILLET12_R * 0.414213562373, -FILLET12_R), FILLET12_R, 90, 45)
            Line((-FILLET12_R * 0.292893218813, -FILLET12_R * 0.292893218813), (0, 0))
            Line((0, 0), (FILLET12_R * 0.414213562373, 0))
        make_face()
    extrude(amount=6.35)
    with BuildSketch(Plane(origin=(24.959886159, 92.075, 3.175), x_dir=(-0.6854504427601431, 0.7281192831672045, 0), z_dir=(0, 0, -1))) as fillet12_piece_6:
        with BuildLine():
            CenterArc((2.81974937, 6.268704259), FILLET12_R, 223.271042222, 37.550935819)
            Line((-1.803808078, 1.916093948), (0, 0))
            ThreePointArc((0, 0), (0.90345418, 0.072515801), (1.806908361, 0))
        make_face()
    extrude(amount=6.35)


solid = part.part
